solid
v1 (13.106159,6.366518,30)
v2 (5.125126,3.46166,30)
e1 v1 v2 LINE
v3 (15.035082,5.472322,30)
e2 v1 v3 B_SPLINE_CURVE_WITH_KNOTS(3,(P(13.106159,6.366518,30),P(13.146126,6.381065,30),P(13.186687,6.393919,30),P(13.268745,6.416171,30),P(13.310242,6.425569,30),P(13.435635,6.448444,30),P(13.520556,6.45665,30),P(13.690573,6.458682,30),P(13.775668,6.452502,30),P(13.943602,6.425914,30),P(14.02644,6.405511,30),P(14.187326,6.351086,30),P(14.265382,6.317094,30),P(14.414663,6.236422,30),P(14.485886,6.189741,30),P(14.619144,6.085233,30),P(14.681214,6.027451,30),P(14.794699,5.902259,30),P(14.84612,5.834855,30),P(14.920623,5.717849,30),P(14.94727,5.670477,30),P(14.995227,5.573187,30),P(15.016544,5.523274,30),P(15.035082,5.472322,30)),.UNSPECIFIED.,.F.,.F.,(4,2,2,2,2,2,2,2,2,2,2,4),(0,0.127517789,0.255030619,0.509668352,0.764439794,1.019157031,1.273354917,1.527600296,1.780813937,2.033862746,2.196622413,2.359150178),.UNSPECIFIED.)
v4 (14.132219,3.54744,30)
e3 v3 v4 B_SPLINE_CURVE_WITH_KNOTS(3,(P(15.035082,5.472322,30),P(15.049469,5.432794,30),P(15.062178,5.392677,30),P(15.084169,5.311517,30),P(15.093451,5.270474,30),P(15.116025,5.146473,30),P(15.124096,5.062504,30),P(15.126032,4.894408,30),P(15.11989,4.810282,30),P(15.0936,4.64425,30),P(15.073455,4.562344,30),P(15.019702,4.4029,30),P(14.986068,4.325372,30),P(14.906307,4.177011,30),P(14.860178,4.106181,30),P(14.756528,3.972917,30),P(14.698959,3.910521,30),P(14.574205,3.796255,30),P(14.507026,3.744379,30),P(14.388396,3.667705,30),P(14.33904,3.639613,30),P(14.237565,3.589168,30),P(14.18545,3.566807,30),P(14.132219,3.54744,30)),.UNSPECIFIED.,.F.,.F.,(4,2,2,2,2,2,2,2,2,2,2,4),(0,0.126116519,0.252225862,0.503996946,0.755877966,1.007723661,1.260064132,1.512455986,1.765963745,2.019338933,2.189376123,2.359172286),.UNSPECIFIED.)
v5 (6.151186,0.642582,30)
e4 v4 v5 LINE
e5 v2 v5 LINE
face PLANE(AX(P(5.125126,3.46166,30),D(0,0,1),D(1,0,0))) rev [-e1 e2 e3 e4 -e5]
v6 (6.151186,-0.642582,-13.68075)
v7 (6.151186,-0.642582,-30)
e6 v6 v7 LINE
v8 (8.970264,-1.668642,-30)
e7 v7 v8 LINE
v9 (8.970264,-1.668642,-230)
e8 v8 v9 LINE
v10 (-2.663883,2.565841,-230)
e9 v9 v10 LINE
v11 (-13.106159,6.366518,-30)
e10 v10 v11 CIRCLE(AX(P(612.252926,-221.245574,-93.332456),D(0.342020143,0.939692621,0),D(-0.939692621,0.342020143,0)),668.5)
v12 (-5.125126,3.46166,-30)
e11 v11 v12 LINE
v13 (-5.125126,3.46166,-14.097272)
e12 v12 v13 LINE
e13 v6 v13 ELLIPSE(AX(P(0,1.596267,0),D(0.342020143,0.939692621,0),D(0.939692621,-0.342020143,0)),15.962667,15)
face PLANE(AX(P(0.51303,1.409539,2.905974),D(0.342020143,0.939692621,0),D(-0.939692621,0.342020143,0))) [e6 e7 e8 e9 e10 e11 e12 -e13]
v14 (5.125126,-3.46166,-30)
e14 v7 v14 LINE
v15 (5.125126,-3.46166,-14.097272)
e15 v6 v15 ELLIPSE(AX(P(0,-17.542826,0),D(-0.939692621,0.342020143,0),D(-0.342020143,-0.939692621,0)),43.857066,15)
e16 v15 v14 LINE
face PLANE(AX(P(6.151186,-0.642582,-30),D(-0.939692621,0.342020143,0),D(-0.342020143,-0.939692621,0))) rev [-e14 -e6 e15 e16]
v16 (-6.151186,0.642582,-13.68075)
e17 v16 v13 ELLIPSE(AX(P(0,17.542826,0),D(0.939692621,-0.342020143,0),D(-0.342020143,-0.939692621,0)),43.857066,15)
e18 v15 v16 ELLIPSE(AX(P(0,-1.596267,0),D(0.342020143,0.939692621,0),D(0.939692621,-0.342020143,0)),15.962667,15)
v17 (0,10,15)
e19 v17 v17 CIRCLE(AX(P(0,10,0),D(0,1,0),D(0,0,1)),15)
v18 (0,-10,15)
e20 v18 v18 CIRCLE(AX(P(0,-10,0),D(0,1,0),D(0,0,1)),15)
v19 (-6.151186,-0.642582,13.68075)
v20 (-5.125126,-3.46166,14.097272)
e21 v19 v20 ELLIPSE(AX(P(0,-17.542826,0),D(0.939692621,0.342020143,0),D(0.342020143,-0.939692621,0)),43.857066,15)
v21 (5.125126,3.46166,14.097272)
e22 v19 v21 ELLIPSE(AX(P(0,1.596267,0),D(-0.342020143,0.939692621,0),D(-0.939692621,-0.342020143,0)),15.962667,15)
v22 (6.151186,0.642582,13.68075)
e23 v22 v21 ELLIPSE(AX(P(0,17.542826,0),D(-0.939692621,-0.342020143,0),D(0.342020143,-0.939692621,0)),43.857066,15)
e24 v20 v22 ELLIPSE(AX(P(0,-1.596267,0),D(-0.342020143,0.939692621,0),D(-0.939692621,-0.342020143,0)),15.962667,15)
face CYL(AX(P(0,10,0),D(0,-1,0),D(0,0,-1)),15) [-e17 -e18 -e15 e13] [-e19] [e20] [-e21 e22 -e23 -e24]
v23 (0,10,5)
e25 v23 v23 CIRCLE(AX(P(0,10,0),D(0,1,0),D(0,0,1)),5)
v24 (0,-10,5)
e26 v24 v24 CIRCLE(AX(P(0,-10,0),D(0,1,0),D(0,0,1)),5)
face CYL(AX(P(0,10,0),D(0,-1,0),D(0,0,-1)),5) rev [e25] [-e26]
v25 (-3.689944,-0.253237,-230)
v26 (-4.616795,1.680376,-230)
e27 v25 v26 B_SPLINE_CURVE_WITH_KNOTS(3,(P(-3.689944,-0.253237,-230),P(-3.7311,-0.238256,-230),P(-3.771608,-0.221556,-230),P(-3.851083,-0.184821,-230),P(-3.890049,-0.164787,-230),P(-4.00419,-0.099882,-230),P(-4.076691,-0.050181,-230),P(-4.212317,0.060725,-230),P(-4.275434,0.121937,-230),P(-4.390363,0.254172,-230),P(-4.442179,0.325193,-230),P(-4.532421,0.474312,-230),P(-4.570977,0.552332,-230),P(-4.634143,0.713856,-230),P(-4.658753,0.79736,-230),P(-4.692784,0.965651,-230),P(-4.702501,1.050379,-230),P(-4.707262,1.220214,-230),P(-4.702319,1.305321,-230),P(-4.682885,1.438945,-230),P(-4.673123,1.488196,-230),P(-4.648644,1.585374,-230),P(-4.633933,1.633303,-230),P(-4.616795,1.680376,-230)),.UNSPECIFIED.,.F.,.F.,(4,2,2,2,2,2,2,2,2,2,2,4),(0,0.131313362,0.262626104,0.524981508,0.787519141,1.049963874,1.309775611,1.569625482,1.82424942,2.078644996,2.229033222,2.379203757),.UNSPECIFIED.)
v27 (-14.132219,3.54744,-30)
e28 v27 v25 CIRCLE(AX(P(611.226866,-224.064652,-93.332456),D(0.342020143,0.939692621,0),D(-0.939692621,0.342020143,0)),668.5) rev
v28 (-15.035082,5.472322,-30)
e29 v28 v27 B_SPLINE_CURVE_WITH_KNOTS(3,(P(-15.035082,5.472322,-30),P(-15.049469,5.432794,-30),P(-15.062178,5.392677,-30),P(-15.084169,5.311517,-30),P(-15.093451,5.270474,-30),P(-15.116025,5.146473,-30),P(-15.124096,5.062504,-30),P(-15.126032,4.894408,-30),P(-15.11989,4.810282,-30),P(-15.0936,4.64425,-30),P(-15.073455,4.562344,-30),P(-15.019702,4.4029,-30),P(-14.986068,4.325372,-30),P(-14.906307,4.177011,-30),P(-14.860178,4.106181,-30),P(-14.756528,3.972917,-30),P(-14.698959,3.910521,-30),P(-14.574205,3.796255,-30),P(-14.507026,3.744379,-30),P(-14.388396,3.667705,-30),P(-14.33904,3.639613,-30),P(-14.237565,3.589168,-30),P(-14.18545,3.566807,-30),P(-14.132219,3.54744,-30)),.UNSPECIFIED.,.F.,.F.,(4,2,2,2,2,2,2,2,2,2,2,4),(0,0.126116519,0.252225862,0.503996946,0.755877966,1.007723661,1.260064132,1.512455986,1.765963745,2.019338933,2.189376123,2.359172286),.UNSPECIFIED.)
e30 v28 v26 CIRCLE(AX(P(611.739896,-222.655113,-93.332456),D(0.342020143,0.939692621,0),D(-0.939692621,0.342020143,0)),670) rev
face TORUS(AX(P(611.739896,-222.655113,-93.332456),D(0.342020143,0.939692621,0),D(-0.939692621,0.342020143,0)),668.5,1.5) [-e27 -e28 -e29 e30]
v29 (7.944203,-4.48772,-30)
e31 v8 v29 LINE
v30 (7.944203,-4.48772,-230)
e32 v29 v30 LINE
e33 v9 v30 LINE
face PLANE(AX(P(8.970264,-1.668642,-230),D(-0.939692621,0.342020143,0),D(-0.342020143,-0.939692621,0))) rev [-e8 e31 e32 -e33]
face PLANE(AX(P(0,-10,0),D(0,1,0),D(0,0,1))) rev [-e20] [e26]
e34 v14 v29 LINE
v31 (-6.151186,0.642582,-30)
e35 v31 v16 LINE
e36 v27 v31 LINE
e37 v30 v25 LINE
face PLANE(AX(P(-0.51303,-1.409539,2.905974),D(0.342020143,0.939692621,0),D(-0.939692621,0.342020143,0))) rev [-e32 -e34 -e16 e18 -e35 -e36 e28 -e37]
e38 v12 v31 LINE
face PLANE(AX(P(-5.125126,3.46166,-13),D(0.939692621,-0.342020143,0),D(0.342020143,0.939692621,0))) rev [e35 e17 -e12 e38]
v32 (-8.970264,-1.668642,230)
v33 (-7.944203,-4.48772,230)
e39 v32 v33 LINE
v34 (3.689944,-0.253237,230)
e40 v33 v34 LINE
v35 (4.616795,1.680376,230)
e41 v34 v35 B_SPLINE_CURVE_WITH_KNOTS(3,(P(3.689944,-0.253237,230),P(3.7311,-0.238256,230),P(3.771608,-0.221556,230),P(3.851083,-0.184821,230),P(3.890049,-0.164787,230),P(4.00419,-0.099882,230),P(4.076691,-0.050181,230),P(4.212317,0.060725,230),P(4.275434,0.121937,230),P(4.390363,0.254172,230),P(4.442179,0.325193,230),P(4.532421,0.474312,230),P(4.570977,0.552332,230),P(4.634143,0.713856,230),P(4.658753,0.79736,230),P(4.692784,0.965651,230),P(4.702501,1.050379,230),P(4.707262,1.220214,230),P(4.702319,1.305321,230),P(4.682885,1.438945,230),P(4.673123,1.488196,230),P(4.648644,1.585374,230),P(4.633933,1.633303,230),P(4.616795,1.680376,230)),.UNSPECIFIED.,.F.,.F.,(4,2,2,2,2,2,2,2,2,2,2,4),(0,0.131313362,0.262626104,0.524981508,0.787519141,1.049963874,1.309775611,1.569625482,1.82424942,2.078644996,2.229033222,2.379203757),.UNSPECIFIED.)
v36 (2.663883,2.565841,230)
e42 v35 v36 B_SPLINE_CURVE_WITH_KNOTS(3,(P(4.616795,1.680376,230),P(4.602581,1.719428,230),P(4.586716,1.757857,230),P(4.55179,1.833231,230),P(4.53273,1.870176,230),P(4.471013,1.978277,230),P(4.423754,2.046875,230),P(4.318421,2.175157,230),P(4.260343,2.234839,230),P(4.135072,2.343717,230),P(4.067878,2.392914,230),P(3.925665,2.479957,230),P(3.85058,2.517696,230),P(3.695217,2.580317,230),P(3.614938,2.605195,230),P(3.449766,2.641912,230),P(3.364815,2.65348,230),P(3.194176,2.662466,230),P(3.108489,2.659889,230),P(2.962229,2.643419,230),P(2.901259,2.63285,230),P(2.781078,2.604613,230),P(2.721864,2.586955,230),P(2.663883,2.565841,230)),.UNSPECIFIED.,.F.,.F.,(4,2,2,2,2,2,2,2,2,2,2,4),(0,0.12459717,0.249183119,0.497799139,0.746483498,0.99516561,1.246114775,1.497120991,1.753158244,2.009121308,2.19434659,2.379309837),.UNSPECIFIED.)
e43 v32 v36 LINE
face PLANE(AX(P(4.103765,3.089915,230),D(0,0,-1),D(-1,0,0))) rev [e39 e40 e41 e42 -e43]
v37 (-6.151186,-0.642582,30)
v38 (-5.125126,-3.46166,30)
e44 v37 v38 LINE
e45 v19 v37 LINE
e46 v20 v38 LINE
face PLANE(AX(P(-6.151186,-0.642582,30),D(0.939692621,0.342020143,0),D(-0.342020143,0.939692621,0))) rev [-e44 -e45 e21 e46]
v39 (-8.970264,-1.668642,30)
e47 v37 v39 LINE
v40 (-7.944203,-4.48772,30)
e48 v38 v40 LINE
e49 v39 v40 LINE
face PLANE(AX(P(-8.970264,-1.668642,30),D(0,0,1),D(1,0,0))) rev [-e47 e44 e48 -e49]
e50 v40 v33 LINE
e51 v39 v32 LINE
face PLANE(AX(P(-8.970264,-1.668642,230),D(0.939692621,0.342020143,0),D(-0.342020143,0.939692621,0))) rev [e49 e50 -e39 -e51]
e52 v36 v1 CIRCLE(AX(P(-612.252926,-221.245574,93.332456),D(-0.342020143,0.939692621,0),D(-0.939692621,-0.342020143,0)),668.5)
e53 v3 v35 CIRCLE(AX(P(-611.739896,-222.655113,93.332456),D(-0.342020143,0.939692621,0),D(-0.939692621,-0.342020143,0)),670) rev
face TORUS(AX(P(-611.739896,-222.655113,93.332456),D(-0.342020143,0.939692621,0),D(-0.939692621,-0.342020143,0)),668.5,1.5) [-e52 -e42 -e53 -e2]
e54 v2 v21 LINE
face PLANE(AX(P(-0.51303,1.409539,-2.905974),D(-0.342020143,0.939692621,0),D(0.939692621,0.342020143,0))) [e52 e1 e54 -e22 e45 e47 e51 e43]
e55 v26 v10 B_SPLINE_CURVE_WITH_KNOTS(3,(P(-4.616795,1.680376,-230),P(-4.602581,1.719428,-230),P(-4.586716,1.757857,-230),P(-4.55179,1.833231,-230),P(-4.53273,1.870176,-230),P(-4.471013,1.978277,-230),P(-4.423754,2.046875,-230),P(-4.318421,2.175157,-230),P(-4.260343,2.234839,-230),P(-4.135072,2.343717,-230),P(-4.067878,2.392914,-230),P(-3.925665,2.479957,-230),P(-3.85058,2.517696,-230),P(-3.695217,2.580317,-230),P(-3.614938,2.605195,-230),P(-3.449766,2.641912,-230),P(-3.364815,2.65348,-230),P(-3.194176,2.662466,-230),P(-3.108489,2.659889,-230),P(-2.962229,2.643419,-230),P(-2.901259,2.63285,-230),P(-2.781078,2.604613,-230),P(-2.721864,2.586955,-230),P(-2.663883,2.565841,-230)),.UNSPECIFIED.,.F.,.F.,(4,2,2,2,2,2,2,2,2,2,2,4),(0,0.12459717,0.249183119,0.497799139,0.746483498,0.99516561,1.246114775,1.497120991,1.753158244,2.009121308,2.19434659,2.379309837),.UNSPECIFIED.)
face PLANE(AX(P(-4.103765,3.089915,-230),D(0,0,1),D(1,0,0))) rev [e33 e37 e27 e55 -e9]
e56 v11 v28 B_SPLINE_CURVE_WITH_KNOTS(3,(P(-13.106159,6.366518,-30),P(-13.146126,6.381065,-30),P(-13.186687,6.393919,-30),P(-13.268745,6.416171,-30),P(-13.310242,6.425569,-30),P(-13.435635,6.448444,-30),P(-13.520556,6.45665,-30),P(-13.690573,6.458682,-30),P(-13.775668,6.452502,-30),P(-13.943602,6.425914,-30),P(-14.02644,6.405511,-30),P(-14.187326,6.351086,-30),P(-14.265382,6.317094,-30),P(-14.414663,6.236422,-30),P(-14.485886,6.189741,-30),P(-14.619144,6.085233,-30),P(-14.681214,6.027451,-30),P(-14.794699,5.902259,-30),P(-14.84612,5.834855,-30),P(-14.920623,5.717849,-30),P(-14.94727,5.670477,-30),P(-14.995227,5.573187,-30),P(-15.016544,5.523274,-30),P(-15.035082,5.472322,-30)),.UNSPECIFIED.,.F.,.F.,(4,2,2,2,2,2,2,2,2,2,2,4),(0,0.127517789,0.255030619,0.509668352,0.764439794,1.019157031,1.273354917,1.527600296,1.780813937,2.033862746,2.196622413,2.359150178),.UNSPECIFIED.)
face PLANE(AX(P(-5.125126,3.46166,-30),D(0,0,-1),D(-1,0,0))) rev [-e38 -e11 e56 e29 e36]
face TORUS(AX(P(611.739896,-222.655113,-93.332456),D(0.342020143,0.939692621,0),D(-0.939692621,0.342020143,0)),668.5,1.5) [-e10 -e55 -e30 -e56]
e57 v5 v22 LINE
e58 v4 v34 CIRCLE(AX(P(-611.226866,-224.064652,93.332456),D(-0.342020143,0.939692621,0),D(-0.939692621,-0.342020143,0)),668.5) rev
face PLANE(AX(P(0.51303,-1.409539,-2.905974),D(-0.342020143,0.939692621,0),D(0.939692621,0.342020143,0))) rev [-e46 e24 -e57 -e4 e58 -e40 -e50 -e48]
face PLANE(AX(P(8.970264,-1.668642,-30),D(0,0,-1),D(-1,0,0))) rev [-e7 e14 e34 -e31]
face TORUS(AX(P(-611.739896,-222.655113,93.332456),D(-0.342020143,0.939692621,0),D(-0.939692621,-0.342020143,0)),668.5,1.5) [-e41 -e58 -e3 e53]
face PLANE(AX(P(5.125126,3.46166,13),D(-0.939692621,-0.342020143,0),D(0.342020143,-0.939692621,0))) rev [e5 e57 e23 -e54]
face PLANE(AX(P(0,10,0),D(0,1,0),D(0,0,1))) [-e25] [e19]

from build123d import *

# Parameters (mm, degrees)
SKETCH1_R                = 15
SKETCH1_R_2              = 5
BOSS_EXTRUDE1_DEPTH      = 10
BOSS_EXTRUDE2_DEPTH      = 1.5
FILLET1_R                = 1.5
CIRPATTERN1_COUNT        = 2
FILLET1_OF_CIRPATTERN1_R = 1.5


with BuildPart() as part:
    # Sketch1 → Boss-Extrude1 (new, symmetric)
    with BuildSketch(Plane(origin=(0, 0, 0), x_dir=(1, 0, 0), z_dir=(0, 1, 0))):
        with Locations(Location((0, 0, 0), (0, 0, 270))):
            Circle(SKETCH1_R)
        with Locations(Location((0, 0, 0), (0, 0, 270))):
            Circle(SKETCH1_R_2, mode=Mode.SUBTRACT)
    extrude(amount=BOSS_EXTRUDE1_DEPTH, both=True)

    # Sketch3 → Boss-Extrude2 (add, symmetric)
    with BuildSketch(Plane(origin=(0, 0, 0), x_dir=(-0.9396926207859095, 0.34202014332566577, 0), z_dir=(0.34202014332566577, 0.9396926207859095, 0))):
        with BuildLine():
            Line((6, -13), (6, -30))
            Line((6, -30), (16, -30))
            ThreePointArc((16, -30), (17.972915249, -130.416666562), (4.913090625, -230))
            Line((4.913090625, -230), (-9, -230))
            Line((-9, -230), (-9, -30))
            Line((-9, -30), (-6, -30))
            Line((-6, -30), (-6, -13))
            ThreePointArc((-6, -13), (0, -14.094026279), (6, -13))
        make_face()
    boss_extrude2 = extrude(amount=BOSS_EXTRUDE2_DEPTH, both=True)

    # Fillet1
    fillet1_edges = [part.edges().sort_by_distance(p)[0] for p in [
        (-16.375985619, 7.556637981, -130.416666562),
        (-17.402046049, 4.737560118, -130.416666562),
    ]]
    fillet(fillet1_edges, radius=FILLET1_R - 0.0001)  # a hair under: the kernel refuses the full size

    # CirPattern1: Boss-Extrude2 ×2 about axis
    cirpattern1_axis = Axis((0, 0, 0), (0, 1, 0))
    for i in range(1, CIRPATTERN1_COUNT):
        add(boss_extrude2.rotate(cirpattern1_axis, i * 360 / CIRPATTERN1_COUNT))

    # Fillet1 of CirPattern1
    fillet1_of_cirpattern1_edges = [part.edges().sort_by_distance(p)[0] for p in [
        (16.375985619, 7.556637981, 130.416666562),
        (17.402046049, 4.737560118, 130.416666562),
    ]]
    fillet(fillet1_of_cirpattern1_edges, radius=FILLET1_OF_CIRPATTERN1_R - 0.0001)  # a hair under: the kernel refuses the full size


solid = part.part
